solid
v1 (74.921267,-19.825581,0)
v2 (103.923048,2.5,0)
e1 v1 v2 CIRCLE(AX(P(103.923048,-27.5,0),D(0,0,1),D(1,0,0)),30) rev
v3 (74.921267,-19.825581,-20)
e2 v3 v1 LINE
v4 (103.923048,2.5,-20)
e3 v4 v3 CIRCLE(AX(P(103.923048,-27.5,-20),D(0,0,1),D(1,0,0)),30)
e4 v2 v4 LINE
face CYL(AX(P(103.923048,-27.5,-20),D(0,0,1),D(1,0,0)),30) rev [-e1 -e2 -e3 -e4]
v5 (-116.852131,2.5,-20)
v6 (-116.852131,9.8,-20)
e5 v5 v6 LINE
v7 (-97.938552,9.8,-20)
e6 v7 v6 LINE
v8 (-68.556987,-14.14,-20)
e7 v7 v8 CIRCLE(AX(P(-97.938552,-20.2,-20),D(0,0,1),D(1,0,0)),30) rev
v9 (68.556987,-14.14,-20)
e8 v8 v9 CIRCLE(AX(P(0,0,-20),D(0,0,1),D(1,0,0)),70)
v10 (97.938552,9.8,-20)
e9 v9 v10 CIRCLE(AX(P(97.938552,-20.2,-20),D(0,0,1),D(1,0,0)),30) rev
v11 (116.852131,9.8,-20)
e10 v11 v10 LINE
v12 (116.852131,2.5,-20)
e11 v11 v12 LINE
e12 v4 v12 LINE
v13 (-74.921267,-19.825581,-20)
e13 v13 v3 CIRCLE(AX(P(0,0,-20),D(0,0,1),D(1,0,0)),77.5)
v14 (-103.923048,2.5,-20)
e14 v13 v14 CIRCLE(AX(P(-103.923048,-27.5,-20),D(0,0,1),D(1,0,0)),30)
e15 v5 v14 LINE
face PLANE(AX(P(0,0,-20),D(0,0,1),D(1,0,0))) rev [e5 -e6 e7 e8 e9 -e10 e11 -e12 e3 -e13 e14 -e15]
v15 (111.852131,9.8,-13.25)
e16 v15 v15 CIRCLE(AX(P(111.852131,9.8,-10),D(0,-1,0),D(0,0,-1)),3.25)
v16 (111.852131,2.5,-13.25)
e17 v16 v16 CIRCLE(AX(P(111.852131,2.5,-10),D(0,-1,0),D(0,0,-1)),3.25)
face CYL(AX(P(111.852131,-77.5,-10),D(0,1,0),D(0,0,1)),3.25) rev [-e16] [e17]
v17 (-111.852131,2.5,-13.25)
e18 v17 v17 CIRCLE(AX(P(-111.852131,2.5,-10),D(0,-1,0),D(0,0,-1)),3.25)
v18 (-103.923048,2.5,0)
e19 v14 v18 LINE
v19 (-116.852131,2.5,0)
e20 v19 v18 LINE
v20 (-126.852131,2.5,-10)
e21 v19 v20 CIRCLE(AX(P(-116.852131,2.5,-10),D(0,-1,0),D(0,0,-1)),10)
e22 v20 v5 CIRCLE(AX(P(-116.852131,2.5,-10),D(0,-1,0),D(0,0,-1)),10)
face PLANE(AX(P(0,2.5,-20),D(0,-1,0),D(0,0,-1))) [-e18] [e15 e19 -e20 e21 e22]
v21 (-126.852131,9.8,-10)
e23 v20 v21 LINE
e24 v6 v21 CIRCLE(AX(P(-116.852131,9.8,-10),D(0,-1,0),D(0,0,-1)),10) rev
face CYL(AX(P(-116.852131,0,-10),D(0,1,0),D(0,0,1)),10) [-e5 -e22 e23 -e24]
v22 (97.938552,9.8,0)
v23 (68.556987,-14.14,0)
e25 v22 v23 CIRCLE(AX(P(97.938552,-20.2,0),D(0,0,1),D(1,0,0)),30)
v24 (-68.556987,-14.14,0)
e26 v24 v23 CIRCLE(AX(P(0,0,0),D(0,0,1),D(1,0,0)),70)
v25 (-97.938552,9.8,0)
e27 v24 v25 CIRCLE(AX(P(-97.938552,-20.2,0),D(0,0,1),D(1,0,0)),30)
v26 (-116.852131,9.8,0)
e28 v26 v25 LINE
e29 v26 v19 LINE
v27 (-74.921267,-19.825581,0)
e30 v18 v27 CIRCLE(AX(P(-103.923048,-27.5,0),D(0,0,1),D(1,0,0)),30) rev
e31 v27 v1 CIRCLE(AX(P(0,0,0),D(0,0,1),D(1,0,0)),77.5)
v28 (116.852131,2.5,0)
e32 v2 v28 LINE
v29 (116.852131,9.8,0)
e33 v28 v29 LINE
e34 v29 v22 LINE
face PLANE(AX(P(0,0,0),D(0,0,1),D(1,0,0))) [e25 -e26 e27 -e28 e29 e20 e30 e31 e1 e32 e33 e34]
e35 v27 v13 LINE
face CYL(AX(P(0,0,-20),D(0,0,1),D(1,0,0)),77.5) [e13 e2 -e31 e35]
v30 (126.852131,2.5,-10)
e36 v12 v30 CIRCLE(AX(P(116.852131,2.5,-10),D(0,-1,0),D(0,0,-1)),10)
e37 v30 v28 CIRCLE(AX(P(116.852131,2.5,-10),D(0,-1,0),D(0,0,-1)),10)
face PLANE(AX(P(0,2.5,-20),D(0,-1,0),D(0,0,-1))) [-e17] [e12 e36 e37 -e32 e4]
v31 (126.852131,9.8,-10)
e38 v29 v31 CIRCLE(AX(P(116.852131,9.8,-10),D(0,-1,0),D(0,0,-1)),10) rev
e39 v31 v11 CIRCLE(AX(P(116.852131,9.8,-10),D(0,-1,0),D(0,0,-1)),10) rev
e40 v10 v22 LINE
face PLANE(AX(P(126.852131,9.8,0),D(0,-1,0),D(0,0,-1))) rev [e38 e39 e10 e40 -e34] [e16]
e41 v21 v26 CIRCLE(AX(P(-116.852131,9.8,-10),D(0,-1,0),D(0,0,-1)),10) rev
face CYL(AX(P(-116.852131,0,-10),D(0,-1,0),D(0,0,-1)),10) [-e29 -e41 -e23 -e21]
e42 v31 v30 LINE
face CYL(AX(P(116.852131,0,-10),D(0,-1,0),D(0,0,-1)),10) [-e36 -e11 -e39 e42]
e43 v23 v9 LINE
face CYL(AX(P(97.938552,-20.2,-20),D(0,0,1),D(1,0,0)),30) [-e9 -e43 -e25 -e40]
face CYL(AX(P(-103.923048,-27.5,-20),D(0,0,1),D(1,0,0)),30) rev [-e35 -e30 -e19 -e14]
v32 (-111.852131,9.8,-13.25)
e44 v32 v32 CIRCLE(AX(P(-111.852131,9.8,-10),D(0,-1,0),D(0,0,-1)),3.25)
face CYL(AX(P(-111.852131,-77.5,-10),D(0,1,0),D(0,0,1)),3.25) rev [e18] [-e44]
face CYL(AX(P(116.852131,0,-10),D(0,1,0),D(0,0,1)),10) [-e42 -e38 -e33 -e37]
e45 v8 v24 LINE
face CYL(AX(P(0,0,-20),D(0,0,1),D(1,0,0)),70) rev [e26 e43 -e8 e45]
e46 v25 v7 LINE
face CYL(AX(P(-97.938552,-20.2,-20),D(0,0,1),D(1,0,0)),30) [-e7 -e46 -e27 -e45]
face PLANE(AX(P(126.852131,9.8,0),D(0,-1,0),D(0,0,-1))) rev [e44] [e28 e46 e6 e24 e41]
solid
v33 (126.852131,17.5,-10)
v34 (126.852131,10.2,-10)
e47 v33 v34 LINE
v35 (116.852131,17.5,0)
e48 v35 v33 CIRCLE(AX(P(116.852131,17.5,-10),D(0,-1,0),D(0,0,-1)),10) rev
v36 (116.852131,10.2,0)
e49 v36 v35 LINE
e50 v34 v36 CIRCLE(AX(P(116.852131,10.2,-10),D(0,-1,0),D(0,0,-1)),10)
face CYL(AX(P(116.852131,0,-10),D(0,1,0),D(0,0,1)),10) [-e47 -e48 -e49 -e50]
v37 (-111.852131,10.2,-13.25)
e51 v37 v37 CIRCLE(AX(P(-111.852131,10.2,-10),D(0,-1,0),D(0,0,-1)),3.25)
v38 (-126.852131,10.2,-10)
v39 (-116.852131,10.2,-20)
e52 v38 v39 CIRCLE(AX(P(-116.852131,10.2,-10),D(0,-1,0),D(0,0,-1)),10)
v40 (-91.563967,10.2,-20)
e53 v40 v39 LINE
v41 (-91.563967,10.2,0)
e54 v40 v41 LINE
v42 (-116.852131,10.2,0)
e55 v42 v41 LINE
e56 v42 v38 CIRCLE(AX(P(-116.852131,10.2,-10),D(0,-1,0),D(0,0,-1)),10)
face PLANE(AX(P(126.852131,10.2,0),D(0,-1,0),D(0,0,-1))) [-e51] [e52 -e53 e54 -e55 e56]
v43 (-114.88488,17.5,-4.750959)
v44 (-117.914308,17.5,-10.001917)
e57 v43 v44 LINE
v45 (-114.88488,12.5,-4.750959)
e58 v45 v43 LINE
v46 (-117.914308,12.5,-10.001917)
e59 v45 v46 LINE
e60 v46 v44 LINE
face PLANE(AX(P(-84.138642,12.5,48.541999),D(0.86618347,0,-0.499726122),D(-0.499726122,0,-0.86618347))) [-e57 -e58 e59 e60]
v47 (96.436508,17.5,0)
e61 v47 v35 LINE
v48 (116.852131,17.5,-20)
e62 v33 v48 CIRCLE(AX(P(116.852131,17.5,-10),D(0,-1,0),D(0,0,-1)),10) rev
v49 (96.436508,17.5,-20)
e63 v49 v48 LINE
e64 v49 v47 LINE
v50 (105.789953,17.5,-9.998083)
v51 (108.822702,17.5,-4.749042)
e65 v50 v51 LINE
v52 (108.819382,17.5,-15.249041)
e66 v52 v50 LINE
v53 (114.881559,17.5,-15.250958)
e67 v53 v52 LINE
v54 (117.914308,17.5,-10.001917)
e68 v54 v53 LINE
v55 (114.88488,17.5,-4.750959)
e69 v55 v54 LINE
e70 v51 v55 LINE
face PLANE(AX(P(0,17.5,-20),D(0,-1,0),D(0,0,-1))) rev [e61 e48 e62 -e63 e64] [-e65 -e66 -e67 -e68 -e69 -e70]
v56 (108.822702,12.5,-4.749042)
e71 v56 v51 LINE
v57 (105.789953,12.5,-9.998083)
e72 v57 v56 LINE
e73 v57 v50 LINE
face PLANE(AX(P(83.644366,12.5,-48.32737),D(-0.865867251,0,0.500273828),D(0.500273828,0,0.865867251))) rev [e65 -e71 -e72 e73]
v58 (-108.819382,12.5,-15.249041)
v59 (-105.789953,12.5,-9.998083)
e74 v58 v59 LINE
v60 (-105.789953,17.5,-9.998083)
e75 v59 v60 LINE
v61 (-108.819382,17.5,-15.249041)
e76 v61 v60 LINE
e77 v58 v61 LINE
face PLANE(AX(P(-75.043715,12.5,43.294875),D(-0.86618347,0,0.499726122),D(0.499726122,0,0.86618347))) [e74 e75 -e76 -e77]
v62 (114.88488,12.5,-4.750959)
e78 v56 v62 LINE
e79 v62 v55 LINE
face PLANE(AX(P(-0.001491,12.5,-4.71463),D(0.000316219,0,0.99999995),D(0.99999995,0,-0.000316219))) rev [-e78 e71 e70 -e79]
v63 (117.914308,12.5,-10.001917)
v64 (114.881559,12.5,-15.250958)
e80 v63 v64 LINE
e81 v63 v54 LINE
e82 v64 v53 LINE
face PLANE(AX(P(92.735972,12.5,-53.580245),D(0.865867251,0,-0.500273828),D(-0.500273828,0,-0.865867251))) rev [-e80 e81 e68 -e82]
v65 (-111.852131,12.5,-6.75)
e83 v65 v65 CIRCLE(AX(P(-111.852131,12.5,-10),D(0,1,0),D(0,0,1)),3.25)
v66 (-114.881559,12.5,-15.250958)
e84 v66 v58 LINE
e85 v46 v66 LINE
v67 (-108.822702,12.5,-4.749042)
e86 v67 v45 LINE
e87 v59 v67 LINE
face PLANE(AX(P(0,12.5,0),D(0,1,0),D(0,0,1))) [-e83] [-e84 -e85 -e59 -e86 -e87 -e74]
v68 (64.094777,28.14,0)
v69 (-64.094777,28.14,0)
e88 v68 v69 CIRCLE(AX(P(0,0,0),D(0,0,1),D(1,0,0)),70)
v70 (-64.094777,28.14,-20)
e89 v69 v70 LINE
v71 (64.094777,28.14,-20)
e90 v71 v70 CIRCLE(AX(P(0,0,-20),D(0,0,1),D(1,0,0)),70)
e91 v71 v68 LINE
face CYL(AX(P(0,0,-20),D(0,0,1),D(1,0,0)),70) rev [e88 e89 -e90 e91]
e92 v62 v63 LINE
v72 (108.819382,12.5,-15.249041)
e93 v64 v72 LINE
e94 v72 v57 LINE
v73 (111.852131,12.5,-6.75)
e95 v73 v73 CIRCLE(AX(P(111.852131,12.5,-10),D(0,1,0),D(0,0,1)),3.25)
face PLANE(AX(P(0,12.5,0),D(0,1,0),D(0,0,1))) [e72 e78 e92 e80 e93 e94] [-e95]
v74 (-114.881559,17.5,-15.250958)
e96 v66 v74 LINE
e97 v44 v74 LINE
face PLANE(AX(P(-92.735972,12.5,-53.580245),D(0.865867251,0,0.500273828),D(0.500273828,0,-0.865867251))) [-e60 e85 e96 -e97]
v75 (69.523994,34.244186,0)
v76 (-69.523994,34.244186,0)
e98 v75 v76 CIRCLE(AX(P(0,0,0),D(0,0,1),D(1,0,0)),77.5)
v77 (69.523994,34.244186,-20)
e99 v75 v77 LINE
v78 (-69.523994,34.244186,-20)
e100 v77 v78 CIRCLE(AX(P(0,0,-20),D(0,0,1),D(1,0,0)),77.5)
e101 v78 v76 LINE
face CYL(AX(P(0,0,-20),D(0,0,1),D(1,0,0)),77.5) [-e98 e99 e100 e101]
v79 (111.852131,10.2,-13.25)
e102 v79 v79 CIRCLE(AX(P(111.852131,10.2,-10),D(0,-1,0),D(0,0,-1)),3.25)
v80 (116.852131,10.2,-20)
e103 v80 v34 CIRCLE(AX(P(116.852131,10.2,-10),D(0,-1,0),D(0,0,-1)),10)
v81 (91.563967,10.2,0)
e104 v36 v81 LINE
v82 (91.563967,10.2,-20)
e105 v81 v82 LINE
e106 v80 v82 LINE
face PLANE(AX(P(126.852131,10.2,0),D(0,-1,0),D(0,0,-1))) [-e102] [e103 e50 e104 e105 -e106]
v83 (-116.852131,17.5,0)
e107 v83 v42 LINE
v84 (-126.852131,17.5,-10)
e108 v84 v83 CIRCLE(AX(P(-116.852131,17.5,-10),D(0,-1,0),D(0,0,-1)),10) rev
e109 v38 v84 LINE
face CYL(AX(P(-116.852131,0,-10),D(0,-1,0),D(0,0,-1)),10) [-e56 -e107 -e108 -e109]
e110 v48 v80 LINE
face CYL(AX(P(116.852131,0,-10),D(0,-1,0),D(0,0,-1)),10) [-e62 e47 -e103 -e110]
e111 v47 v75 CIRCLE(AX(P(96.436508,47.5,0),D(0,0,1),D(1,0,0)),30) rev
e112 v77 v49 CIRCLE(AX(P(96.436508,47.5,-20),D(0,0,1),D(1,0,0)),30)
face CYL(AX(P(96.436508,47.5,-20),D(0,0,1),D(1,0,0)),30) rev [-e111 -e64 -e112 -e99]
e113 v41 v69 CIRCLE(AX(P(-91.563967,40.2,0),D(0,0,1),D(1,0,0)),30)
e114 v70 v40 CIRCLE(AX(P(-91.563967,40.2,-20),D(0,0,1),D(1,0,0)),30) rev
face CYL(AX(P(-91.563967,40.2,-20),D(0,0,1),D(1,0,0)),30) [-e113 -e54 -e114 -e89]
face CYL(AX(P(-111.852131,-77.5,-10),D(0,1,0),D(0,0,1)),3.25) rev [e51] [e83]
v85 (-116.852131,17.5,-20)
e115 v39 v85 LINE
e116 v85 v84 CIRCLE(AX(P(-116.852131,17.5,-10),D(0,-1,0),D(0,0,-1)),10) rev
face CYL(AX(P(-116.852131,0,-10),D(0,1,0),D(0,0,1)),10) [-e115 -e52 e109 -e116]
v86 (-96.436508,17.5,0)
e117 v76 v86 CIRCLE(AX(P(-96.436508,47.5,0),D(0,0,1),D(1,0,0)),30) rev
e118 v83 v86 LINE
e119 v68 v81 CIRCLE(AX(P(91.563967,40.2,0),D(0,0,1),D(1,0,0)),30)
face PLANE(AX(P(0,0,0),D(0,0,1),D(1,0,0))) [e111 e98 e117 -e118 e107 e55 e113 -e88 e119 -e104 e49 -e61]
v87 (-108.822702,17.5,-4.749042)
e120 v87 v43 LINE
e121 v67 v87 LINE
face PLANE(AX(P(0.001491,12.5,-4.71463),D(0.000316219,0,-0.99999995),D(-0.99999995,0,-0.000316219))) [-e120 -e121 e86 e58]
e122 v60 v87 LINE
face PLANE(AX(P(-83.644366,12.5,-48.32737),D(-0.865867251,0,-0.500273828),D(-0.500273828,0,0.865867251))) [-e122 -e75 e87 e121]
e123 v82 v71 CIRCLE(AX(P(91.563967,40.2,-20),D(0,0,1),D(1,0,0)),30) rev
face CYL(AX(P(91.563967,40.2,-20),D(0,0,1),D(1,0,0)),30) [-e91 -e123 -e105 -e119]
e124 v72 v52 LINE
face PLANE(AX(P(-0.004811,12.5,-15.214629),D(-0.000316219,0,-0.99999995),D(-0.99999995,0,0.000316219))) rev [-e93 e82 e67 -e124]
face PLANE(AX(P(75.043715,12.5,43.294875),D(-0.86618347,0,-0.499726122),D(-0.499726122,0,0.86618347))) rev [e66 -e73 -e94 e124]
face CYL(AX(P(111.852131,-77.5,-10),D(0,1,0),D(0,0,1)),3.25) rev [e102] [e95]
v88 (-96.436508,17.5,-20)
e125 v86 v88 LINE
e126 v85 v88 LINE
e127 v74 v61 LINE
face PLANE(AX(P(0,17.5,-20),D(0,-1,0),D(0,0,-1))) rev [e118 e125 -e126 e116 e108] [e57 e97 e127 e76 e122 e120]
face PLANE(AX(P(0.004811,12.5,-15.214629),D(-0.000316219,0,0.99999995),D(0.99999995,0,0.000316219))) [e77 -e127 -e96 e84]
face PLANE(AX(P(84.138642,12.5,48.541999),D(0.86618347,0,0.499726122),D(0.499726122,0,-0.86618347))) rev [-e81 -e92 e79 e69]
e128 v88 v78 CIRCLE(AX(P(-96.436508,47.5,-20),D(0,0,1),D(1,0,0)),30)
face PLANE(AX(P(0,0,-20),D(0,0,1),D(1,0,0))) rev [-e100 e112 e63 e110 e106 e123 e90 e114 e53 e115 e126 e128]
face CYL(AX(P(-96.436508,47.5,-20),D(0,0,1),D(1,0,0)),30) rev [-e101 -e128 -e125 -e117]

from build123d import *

# Parameters (mm, degrees)
SKETCH2_R               = 70
BOSS_EXTRUDE1_DEPTH     = 20
CUT_EXTRUDE1_DEPTH      = 267.030265755
CUT_EXTRUDE1_DEPTH_BACK = 267.030265755
SKETCH4_W               = 20
SKETCH4_H               = 0.4
FILLET1_R               = 30
FILLET2_R               = 30
FILLET3_R               = 10
FILLET4_R               = 10
CUT_EXTRUDE2_DEPTH      = 5
SKETCH6_R               = 3.25
CUT_EXTRUDE3_DEPTH      = 160.738733795


with BuildPart() as part:
    # Sketch2 → Boss-Extrude1 (new body)
    with BuildSketch(Plane.XY):
        with BuildLine():
            Line((-126.852130745, 2.5), (-77.459666924, 2.5))
            ThreePointArc((-77.459666924, 2.5), (0, -77.5), (77.459666924, 2.5))
            Line((77.459666924, 2.5), (126.852130745, 2.5))
            Line((126.852130745, 2.5), (126.852130745, 17.5))
            Line((126.852130745, 17.5), (75.498344353, 17.5))
            ThreePointArc((75.498344353, 17.5), (0, 77.5), (-75.498344353, 17.5))
            Line((-75.498344353, 17.5), (-126.852130745, 17.5))
            Line((-126.852130745, 17.5), (-126.852130745, 2.5))
        make_face()
        Circle(SKETCH2_R, mode=Mode.SUBTRACT)
    extrude(amount=-BOSS_EXTRUDE1_DEPTH)

    # Sketch4 → Cut-Extrude1 (cut, two sides: drawn at the far end of the back side and taken through both)
    with BuildSketch(Plane.ZY.offset(126.852130745).offset(-CUT_EXTRUDE1_DEPTH_BACK)):
        with Locations((-10, 10)):
            Rectangle(SKETCH4_W, SKETCH4_H)
    extrude(amount=CUT_EXTRUDE1_DEPTH + CUT_EXTRUDE1_DEPTH_BACK, mode=Mode.SUBTRACT)


with BuildPart() as cut_extrude1_piece_1:
    # of the separate pieces the step leaves, piece 1, a body of its own (cut_extrude1_pieces)
    add(part.part.solids().sort_by_distance((-126.852130745, 9.8, 0))[0])

    # Fillet2
    fillet2_edges = [cut_extrude1_piece_1.edges().sort_by_distance(p)[0] for p in [
        (77.459666924, 2.5, -10),
        (-77.459666924, 2.5, -10),
        (-69.310605249, 9.8, -10),
        (69.310605249, 9.8, -10),
    ]]
    fillet(fillet2_edges, radius=FILLET2_R)

    # Fillet4
    fillet4_edges = [cut_extrude1_piece_1.edges().sort_by_distance(p)[0] for p in [
        (126.852130745, 6.15, 0),
        (126.852130745, 6.15, -20),
        (-126.852130745, 6.15, 0),
        (-126.852130745, 6.15, -20),
    ]]
    fillet(fillet4_edges, radius=FILLET4_R - 0.0001)  # a hair under: the kernel refuses the full size


with BuildPart() as cut_extrude1_piece_2:
    # of the separate pieces the step leaves, piece 2, a body of its own (cut_extrude1_pieces)
    add(part.part.solids().sort_by_distance((-75.498344353, 17.5, 0))[0])

    # Fillet1
    fillet1_edges = [cut_extrude1_piece_2.edges().sort_by_distance(p)[0] for p in [
        (-75.498344353, 17.5, -10),
        (75.498344353, 17.5, -10),
        (69.252869977, 10.2, -10),
        (-69.252869977, 10.2, -10),
    ]]
    fillet(fillet1_edges, radius=FILLET1_R)

    # Fillet3
    fillet3_edges = [cut_extrude1_piece_2.edges().sort_by_distance(p)[0] for p in [
        (-126.852130745, 13.85, 0),
        (-126.852130745, 13.85, -20),
        (126.852130745, 13.85, 0),
        (126.852130745, 13.85, -20),
    ]]
    fillet(fillet3_edges, radius=FILLET3_R - 0.0001)  # a hair under: the kernel refuses the full size

    # Sketch5 → Cut-Extrude2 (cut)
    with BuildSketch(Plane(origin=(0, 17.5, 0), x_dir=(1, 0, 0), z_dir=(0, 1, 0))):
        Polygon((-117.914308268, 10.001916974), (-114.881559358, 15.250958224), (-108.819381835, 15.249041251), (-105.789953221, 9.998083026), (-108.822702131, 4.749041776), (-114.884879654, 4.750958749), align=None)
        Polygon((114.881559358, 15.250958224), (108.819381835, 15.249041251), (105.789953221, 9.998083026), (108.822702131, 4.749041776), (114.884879654, 4.750958749), (117.914308268, 10.001916974), align=None)
    extrude(amount=-CUT_EXTRUDE2_DEPTH, mode=Mode.SUBTRACT)


with BuildPart() as cut_extrude3_tool:
    # Sketch6 → Cut-Extrude3 (new, through all)
    with BuildSketch(Plane(origin=(0, 17.5, 0), x_dir=(1, 0, 0), z_dir=(0, 1, 0))):
        with Locations(Location((-111.852130745, 10, 0), (0, 0, 270))):
            Circle(SKETCH6_R)
        with Locations(Location((111.852130745, 10, 0), (0, 0, 270))):
            Circle(SKETCH6_R)
    extrude(amount=-CUT_EXTRUDE3_DEPTH)


with BuildPart() as cut_extrude1_piece_1_1:
    add(cut_extrude1_piece_1.part)

    # Cut-Extrude3: cut by cut_extrude3_tool
    add(cut_extrude3_tool.part, mode=Mode.SUBTRACT)


with BuildPart() as cut_extrude1_piece_2_1:
    add(cut_extrude1_piece_2.part)

    # Cut-Extrude3: cut by cut_extrude3_tool
    add(cut_extrude3_tool.part, mode=Mode.SUBTRACT)


solid = Compound([cut_extrude1_piece_1_1.part, cut_extrude1_piece_2_1.part])
